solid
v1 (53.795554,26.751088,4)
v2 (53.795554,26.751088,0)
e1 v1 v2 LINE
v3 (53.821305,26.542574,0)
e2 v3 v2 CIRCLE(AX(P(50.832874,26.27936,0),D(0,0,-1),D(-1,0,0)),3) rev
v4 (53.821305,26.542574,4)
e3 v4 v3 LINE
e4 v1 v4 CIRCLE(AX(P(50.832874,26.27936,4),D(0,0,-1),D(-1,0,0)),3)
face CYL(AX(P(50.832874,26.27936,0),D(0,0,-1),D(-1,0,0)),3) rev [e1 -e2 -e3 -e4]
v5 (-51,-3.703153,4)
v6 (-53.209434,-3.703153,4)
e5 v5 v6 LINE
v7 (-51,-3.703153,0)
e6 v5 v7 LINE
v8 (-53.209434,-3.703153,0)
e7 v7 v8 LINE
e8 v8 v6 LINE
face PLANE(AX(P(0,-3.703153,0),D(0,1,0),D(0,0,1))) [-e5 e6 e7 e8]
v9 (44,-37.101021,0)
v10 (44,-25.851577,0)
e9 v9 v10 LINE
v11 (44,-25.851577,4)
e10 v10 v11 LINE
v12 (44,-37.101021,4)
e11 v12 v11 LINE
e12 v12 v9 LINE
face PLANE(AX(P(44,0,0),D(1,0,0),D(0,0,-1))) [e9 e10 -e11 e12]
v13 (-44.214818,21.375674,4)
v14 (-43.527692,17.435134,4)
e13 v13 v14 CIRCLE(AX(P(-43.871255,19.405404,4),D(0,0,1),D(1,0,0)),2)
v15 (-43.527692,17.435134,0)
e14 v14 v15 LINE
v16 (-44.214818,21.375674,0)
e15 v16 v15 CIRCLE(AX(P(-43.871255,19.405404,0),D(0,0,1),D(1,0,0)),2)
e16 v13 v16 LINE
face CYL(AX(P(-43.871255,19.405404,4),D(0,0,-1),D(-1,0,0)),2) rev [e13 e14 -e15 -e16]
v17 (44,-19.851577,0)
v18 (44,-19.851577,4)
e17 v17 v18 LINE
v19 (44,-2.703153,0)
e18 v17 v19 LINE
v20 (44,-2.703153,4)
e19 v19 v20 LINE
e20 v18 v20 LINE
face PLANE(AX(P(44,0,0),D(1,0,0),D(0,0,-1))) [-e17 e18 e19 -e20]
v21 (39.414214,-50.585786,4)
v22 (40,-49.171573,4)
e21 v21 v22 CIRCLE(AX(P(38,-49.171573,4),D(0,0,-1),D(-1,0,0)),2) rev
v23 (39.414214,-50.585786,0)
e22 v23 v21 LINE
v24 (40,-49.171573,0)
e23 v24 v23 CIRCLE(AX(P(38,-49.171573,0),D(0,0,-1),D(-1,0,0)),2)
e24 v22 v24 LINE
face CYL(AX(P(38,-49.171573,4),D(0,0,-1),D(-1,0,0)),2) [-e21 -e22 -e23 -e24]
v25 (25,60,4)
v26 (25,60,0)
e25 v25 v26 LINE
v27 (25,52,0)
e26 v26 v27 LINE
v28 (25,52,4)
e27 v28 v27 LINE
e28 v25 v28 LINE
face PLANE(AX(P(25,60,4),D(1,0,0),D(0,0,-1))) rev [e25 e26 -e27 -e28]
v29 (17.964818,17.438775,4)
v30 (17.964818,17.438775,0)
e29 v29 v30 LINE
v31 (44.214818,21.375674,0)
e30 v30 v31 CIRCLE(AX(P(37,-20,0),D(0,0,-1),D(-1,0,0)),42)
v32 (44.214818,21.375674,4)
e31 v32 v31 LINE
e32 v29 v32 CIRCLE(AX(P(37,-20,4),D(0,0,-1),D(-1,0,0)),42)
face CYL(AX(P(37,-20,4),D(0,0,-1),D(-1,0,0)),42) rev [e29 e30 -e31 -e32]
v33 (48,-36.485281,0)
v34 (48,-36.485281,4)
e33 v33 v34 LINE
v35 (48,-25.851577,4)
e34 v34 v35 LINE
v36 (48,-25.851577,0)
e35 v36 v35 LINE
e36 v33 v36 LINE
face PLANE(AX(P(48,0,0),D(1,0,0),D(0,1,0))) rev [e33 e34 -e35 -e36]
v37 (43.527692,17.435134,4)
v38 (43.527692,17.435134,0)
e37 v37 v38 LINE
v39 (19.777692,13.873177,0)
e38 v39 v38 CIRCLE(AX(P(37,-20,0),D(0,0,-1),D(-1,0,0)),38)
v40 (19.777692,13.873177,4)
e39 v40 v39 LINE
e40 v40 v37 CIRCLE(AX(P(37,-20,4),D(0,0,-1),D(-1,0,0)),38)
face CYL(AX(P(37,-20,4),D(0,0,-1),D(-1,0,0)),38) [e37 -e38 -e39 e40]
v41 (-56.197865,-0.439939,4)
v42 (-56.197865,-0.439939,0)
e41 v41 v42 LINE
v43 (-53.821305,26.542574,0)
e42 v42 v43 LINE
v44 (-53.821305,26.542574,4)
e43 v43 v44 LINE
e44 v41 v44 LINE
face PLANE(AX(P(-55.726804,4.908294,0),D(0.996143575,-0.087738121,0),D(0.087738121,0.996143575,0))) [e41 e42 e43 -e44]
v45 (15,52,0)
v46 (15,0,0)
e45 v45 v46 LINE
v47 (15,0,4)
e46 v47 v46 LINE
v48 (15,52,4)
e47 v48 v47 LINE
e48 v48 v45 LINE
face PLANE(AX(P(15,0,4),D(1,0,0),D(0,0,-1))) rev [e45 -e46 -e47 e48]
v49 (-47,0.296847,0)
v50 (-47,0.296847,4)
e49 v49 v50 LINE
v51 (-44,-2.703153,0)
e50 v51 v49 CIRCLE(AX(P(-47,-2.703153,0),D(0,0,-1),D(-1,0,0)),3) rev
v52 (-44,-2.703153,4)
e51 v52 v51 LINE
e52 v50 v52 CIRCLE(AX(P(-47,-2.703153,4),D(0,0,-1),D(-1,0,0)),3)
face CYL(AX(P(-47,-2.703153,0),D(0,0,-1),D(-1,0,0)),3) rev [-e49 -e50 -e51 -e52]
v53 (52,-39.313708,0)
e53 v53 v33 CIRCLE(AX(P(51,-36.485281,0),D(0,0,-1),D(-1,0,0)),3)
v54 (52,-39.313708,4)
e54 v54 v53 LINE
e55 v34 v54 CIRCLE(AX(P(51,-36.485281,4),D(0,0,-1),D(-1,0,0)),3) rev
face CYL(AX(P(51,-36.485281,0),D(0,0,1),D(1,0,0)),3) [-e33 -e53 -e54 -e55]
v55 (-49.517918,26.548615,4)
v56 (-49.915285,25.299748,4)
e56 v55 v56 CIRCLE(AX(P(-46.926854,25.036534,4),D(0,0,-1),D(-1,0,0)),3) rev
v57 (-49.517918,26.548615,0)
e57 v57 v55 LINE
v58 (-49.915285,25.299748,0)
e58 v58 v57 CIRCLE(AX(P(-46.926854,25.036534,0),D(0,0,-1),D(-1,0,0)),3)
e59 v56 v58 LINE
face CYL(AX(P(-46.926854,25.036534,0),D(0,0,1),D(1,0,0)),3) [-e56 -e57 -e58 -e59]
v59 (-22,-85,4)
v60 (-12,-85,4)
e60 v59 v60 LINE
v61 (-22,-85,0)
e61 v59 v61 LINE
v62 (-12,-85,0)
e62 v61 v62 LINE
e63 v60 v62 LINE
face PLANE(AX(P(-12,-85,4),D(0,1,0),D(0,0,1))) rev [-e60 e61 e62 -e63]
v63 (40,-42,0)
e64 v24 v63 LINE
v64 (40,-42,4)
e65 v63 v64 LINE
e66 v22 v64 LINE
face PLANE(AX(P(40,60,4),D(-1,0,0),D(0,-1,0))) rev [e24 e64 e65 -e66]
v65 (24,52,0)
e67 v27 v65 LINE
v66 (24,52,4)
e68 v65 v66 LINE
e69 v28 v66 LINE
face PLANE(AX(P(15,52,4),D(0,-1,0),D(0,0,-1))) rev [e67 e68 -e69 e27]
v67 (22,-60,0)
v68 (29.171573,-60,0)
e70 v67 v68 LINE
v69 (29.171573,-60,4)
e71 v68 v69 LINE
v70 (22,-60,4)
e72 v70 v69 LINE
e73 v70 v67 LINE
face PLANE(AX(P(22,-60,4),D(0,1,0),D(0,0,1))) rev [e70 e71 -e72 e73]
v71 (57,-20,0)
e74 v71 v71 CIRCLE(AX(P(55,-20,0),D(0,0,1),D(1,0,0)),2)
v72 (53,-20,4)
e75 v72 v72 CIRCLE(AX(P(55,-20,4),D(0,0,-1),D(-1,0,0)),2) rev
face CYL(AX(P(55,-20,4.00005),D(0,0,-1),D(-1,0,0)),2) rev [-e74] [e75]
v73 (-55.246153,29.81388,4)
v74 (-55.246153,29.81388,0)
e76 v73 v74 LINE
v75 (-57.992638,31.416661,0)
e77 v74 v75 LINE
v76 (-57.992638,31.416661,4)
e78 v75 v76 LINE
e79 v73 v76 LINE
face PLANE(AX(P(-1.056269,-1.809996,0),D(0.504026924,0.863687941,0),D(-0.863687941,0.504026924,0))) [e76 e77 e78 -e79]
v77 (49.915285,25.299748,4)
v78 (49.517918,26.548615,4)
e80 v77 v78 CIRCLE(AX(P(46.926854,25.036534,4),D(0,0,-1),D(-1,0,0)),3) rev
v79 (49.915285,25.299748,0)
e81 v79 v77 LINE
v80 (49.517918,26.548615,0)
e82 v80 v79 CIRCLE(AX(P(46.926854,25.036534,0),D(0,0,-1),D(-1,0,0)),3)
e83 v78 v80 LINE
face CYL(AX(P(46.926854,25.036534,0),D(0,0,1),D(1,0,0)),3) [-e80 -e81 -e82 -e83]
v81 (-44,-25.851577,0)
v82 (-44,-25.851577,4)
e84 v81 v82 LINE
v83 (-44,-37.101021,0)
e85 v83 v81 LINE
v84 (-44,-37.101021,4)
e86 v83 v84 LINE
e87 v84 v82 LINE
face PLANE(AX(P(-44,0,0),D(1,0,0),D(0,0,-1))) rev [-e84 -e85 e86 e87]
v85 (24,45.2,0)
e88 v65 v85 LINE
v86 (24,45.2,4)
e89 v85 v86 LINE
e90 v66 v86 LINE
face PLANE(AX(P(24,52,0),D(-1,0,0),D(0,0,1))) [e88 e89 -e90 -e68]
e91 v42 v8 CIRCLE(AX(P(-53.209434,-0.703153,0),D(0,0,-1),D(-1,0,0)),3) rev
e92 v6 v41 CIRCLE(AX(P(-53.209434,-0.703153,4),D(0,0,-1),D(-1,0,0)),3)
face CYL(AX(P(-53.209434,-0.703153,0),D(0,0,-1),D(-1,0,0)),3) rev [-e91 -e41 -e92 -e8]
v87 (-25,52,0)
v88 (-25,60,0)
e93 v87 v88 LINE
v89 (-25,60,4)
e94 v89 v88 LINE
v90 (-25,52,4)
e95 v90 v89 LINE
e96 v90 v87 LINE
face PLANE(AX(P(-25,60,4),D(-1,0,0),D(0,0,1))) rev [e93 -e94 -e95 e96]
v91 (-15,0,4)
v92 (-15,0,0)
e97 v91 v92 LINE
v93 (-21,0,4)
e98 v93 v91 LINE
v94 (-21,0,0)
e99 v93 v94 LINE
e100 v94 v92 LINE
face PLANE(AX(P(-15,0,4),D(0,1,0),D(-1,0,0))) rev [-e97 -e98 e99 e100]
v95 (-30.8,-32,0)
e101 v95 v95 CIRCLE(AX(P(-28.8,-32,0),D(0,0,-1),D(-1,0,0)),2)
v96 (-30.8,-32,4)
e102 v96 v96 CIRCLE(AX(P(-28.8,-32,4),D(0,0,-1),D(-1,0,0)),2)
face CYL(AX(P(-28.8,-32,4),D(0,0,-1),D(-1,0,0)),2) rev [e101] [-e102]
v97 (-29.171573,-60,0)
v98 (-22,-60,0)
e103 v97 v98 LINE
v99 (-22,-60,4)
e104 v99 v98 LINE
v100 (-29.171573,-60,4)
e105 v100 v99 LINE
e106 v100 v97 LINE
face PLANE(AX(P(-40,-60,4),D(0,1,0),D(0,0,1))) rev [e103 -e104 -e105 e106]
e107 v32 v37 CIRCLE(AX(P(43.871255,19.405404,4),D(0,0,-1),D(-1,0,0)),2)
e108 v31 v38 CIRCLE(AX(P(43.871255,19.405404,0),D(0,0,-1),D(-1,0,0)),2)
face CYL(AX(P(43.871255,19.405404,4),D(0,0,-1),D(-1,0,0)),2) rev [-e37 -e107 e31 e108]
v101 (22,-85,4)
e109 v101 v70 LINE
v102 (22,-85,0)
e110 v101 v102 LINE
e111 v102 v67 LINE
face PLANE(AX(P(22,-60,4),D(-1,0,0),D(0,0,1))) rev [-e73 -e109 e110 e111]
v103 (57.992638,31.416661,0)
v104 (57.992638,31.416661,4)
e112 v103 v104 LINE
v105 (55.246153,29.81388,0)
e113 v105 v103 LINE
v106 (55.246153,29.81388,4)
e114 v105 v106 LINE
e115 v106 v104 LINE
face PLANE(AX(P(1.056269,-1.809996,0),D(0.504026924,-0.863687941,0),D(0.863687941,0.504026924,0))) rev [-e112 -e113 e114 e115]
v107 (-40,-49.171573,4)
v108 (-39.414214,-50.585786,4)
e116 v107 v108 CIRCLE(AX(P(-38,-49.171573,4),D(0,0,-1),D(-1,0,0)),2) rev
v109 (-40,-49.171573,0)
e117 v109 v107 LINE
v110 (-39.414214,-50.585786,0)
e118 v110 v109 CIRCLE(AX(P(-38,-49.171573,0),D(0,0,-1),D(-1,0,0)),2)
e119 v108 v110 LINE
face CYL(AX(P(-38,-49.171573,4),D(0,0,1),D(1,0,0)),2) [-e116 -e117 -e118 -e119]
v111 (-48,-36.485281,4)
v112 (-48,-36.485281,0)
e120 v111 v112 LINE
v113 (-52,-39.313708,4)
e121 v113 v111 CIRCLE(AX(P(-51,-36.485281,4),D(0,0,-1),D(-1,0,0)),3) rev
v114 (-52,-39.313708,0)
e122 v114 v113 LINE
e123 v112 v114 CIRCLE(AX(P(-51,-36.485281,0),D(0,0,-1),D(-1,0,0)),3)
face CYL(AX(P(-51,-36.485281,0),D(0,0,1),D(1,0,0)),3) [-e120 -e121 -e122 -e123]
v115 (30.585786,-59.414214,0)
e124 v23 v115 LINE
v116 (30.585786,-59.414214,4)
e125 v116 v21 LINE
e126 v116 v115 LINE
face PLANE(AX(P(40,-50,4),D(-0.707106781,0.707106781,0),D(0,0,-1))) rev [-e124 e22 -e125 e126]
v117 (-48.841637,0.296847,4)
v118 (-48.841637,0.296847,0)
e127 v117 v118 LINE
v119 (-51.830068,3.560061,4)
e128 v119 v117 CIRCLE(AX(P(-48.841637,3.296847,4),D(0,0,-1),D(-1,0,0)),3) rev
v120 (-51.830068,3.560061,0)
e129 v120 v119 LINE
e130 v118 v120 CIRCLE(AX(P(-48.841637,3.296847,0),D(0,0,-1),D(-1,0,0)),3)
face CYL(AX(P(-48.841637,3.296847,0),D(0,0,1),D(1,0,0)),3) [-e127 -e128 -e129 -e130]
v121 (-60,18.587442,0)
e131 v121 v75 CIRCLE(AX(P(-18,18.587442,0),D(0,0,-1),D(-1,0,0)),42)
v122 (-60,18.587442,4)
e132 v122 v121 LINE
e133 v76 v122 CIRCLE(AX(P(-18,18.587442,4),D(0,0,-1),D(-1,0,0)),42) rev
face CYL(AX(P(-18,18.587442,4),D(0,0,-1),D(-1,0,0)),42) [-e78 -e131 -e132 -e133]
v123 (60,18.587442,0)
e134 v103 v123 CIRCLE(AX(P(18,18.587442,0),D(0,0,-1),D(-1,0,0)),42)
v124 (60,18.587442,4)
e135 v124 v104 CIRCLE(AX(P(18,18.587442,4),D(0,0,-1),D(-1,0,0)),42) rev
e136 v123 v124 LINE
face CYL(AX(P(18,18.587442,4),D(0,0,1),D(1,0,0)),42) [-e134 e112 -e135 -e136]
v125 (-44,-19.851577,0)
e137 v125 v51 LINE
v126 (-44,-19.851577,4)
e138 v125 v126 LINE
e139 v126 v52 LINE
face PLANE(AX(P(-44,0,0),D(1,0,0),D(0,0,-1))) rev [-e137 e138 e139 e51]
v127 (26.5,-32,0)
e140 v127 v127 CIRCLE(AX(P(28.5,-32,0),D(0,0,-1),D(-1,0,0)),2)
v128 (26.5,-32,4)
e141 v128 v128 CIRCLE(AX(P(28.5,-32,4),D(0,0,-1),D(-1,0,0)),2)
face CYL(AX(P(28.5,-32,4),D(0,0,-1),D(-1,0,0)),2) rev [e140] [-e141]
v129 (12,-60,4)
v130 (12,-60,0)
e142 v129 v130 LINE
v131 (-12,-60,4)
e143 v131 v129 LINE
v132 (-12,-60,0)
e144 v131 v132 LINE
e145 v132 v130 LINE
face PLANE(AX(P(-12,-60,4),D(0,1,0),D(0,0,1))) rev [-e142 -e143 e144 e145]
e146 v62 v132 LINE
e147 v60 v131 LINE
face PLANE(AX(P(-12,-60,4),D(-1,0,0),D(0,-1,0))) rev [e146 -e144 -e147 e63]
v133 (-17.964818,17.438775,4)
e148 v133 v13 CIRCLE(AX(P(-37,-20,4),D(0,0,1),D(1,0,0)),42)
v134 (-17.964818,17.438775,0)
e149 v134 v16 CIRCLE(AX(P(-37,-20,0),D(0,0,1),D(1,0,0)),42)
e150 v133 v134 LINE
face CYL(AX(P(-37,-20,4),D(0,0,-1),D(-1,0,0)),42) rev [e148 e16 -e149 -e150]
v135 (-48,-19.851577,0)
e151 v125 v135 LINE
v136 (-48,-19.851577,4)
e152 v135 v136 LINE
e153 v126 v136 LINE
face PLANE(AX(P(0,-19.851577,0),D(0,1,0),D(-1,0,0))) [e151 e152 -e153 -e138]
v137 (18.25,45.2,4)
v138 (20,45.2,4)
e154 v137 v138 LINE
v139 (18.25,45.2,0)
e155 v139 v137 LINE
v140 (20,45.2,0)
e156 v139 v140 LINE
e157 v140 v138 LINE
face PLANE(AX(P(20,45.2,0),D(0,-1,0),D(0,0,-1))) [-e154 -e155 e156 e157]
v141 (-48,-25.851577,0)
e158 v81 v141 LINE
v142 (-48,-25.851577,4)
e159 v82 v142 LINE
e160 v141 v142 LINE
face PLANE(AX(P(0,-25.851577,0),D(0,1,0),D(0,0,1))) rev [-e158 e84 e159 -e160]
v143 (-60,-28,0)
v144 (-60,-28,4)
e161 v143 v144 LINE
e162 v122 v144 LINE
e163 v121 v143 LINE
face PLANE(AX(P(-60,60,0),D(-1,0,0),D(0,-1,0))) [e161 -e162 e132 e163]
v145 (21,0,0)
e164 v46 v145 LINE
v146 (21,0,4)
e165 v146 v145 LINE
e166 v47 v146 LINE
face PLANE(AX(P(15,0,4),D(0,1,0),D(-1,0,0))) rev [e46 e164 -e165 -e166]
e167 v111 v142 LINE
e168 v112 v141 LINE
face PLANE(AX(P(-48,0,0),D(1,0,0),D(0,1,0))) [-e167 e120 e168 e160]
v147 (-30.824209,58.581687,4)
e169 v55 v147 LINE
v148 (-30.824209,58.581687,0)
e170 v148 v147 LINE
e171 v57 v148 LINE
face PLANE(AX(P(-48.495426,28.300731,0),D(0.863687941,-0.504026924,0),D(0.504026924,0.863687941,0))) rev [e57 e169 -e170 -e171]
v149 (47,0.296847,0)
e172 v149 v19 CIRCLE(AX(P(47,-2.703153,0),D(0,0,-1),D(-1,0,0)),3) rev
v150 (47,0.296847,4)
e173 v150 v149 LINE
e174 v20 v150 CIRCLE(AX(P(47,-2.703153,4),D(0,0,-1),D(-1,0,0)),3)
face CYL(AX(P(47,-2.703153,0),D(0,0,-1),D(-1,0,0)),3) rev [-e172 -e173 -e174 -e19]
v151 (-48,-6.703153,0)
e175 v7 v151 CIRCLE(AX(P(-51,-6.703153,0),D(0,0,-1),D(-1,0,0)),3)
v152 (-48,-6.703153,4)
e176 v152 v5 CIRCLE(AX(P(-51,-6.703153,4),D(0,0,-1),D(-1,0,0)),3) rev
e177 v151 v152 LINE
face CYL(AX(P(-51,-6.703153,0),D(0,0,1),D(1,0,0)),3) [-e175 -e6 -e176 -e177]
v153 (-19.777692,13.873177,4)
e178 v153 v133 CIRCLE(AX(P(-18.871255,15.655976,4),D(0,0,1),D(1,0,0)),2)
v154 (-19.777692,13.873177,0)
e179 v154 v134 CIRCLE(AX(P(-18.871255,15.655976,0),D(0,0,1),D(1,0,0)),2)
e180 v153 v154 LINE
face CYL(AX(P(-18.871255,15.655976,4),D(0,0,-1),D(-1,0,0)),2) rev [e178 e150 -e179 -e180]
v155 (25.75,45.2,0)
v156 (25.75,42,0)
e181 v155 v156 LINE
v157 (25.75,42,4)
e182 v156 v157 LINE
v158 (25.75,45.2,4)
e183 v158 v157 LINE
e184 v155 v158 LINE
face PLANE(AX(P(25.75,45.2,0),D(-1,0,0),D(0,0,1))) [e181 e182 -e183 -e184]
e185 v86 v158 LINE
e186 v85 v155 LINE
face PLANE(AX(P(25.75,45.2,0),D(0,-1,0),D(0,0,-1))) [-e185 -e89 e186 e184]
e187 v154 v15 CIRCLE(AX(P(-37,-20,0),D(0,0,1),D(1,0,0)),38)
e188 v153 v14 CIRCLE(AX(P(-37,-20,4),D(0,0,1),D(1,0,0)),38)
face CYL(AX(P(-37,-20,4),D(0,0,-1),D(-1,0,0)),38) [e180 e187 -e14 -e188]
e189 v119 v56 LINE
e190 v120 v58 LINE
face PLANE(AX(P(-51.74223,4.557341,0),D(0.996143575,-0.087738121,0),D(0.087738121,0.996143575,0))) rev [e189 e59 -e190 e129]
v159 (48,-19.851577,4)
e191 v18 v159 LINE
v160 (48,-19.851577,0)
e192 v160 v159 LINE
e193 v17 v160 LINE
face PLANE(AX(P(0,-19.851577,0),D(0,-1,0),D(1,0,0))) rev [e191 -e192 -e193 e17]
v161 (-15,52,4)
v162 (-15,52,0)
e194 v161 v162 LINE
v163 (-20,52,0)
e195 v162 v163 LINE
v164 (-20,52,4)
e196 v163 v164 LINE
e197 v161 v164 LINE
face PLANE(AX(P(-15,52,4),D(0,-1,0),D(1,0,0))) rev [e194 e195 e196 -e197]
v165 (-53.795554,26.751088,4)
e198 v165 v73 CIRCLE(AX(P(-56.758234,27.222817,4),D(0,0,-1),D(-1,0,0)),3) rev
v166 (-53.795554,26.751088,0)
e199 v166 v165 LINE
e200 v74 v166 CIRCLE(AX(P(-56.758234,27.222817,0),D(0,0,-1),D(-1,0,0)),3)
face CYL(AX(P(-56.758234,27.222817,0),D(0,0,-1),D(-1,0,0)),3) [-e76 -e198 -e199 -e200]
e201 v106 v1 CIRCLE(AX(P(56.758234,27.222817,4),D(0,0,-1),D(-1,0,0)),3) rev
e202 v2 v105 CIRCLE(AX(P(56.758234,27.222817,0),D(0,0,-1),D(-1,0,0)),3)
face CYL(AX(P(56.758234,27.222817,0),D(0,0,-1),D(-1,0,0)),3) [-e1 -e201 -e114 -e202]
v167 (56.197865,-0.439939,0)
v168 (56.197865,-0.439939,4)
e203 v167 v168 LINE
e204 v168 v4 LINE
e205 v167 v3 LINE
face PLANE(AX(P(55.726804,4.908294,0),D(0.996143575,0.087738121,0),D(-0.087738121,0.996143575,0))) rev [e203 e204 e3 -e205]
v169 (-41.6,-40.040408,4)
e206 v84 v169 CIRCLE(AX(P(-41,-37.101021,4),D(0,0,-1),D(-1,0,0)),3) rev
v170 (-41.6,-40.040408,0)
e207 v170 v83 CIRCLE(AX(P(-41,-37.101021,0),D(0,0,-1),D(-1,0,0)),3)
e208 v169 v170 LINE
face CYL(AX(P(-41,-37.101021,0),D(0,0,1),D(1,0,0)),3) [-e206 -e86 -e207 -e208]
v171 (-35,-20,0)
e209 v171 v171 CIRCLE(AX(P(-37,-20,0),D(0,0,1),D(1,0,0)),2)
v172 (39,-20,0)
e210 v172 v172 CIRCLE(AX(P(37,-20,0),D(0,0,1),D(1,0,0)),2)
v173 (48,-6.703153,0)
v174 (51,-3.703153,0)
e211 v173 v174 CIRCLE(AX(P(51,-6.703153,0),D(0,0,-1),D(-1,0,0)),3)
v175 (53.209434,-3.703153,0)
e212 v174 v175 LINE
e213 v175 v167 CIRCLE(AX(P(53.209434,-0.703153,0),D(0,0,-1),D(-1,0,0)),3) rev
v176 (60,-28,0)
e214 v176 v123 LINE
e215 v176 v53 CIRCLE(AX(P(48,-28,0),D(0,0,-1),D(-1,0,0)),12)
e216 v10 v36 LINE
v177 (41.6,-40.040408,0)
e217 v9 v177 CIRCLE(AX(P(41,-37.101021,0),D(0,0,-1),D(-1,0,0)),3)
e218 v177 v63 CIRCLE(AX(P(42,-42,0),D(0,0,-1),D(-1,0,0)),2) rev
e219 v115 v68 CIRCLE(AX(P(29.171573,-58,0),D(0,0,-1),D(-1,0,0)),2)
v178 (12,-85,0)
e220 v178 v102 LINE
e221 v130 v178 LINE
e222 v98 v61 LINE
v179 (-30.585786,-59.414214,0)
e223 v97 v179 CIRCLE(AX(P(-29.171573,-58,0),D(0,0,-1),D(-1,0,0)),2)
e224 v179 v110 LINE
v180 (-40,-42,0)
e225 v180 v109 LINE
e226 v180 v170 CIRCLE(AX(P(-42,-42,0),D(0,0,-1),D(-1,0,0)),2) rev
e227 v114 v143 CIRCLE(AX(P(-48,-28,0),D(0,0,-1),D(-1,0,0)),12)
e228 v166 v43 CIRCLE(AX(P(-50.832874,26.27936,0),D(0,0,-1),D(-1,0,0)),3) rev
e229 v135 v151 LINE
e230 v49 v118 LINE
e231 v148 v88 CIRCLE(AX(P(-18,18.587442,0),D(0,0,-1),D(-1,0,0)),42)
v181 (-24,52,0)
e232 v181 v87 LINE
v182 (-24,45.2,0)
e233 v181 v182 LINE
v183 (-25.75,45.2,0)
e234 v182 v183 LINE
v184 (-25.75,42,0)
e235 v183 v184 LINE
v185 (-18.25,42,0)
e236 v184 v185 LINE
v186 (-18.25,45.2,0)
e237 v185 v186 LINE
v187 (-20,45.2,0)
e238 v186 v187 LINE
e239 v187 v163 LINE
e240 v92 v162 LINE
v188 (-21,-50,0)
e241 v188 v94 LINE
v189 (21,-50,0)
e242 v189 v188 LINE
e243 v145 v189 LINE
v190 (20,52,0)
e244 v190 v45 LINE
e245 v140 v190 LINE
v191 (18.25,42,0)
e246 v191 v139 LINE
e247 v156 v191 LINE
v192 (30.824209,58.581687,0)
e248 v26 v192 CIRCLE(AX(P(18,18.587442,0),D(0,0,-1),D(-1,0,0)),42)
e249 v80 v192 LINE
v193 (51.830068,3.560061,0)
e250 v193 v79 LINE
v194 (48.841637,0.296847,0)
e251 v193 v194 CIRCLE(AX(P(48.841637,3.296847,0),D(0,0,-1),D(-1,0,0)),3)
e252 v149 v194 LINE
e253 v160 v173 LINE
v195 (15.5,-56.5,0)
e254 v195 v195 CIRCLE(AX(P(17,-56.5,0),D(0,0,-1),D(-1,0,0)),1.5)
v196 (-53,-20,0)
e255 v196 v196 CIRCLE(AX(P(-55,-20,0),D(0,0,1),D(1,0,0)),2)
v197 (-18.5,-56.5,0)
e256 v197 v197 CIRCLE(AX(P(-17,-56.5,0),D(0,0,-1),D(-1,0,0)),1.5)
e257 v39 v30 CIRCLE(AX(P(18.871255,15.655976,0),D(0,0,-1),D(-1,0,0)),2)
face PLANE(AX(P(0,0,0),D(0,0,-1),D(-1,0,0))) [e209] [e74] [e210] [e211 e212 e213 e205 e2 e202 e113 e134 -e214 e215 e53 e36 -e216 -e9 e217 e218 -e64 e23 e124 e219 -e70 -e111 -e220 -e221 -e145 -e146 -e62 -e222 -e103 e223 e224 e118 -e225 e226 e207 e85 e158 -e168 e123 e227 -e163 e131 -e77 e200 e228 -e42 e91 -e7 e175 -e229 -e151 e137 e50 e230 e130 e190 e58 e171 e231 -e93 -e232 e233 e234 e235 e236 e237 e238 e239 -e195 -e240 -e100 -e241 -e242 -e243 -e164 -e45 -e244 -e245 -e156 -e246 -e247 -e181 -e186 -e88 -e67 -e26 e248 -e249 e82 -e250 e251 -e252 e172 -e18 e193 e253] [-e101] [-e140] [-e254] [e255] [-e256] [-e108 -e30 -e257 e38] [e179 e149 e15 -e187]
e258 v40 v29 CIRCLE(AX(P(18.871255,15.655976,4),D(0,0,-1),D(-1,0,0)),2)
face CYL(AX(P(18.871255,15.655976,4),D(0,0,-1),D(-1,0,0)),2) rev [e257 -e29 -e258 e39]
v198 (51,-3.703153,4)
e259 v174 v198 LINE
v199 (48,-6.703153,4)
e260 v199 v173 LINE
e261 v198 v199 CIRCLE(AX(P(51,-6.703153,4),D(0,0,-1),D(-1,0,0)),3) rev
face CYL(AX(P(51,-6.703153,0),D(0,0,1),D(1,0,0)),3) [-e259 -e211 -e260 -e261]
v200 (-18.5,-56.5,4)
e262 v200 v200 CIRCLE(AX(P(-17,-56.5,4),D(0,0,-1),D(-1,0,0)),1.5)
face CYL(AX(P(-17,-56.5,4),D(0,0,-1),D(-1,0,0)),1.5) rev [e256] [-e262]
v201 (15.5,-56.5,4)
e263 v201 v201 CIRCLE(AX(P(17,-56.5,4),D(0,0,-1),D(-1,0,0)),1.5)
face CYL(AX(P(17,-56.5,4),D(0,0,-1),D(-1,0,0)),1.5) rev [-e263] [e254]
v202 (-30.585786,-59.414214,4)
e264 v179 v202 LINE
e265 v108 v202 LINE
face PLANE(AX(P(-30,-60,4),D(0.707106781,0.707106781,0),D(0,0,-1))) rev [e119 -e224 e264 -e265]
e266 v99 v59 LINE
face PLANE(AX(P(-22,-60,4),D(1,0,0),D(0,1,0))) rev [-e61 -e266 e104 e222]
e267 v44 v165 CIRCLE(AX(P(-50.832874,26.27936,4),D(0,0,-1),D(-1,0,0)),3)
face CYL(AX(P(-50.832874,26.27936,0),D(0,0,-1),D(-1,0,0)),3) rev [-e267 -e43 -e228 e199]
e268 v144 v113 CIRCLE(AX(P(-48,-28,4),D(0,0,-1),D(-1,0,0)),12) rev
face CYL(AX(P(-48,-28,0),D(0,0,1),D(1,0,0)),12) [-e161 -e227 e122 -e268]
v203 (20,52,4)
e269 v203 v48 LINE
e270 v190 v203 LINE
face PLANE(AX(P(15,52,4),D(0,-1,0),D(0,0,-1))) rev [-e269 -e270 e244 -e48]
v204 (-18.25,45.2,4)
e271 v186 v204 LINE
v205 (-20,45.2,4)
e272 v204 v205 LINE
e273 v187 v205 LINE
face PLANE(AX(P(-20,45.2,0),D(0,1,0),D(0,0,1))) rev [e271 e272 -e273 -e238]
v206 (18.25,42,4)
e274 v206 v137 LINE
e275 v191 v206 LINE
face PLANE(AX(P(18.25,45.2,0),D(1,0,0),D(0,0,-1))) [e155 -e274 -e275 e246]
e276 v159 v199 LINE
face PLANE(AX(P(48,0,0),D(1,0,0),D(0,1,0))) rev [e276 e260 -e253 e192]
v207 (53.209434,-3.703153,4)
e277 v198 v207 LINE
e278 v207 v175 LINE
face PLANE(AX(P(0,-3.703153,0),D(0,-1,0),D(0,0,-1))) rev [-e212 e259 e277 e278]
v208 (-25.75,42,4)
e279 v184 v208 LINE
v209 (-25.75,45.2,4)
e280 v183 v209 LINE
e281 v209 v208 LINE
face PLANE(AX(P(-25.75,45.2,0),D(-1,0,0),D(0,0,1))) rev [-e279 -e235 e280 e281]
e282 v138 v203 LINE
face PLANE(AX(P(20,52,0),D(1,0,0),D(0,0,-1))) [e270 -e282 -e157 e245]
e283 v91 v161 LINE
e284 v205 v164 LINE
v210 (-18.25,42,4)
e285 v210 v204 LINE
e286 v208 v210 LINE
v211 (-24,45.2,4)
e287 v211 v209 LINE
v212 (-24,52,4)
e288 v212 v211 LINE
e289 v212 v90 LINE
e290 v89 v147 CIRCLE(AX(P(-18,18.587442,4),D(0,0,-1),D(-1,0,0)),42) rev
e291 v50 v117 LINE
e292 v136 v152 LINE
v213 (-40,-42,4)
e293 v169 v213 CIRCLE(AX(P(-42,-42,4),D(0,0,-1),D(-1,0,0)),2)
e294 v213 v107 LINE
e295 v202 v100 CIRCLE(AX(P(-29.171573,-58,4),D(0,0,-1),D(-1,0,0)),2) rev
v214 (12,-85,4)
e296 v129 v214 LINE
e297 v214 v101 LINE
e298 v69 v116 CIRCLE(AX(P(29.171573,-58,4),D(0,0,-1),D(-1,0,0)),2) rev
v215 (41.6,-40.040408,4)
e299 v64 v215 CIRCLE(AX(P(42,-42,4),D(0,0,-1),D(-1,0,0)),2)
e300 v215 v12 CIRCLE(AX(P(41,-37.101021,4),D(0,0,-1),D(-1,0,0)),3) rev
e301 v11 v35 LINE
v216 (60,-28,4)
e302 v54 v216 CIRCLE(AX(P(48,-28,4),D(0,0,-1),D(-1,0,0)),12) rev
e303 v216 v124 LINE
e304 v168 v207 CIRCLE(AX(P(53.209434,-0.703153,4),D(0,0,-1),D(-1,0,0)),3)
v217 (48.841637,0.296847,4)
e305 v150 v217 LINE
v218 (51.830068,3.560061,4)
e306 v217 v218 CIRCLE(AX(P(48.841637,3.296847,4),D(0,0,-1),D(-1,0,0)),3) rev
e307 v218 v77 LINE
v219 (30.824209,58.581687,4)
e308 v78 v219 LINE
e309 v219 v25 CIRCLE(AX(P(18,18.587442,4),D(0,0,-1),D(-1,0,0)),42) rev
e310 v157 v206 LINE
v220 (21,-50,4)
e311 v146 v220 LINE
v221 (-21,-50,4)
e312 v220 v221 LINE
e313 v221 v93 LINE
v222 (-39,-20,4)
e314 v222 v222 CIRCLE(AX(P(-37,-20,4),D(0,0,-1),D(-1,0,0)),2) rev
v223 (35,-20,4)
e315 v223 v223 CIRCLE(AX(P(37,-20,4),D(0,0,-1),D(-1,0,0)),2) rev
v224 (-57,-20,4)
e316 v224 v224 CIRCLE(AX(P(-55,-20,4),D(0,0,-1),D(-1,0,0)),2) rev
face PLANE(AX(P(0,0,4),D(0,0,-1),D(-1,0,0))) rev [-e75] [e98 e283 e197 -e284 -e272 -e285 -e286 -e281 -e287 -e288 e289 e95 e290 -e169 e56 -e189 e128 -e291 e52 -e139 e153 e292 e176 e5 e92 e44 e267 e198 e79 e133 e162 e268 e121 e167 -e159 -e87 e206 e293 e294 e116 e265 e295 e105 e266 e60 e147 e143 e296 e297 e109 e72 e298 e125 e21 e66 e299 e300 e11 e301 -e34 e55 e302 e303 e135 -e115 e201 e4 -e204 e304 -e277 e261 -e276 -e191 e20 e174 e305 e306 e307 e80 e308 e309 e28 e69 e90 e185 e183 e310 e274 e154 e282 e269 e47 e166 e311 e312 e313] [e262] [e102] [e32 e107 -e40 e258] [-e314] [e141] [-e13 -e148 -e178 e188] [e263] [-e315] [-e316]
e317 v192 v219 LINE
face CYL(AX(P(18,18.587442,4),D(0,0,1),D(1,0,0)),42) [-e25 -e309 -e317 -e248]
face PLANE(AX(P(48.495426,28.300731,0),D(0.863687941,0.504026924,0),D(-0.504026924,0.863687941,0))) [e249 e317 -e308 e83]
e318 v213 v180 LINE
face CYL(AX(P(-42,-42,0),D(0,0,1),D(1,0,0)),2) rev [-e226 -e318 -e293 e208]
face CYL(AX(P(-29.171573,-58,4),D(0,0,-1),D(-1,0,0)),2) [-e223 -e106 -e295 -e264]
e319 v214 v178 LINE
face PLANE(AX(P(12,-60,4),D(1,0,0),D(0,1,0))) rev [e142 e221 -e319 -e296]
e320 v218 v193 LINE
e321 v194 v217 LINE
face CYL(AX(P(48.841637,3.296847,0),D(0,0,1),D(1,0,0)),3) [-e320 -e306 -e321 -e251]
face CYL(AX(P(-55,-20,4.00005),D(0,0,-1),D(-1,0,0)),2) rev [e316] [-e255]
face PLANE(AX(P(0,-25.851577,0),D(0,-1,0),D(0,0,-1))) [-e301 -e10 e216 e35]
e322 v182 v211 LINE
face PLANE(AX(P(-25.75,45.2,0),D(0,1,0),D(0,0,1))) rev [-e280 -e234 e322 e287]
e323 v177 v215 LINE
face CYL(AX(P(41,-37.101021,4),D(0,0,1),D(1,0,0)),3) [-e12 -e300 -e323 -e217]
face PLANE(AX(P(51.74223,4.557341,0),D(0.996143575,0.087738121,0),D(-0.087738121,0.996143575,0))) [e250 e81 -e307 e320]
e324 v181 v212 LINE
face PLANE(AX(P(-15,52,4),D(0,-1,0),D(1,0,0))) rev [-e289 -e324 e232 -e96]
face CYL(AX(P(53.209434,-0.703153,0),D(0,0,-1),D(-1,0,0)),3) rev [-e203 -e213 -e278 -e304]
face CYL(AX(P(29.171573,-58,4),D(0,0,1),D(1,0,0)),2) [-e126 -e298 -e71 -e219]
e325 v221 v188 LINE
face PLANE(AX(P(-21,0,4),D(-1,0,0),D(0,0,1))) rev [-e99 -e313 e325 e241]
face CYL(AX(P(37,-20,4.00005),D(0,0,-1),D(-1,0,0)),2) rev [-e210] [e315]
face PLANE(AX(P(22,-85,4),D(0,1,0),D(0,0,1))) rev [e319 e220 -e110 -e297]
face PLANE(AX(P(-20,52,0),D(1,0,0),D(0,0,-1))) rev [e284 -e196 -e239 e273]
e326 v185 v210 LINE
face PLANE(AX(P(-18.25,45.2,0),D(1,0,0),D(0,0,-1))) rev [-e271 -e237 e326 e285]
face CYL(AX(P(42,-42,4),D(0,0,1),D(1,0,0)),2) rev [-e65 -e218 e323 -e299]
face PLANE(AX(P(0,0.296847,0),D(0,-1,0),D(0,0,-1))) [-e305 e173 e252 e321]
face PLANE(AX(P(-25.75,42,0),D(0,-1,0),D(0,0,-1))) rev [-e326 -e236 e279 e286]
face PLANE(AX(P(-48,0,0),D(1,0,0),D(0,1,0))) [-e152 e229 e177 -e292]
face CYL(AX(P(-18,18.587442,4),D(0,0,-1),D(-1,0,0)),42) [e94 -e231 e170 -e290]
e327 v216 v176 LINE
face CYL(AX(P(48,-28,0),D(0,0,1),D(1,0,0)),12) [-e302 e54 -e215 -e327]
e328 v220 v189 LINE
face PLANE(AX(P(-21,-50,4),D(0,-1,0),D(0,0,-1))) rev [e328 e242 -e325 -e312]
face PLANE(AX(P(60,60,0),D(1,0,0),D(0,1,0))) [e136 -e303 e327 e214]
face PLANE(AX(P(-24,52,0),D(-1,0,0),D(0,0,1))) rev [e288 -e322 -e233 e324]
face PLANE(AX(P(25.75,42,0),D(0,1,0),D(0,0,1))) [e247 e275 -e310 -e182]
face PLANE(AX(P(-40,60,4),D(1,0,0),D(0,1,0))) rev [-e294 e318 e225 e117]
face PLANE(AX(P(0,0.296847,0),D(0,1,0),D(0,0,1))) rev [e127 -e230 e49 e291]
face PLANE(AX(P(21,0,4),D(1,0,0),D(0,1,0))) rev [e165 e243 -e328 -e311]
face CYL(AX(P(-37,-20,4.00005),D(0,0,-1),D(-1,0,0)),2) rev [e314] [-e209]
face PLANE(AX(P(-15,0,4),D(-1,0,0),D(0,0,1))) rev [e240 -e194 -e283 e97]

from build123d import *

# Parameters (mm, degrees)
BOSS_EXTRUDE1_DEPTH = 4
SKETCH2_R           = 2
SKETCH2_R_2         = 1.5
CUT_EXTRUDE1_DEPTH  = 95.026591983
SKETCH4_W           = 20
SKETCH4_H           = 100
BOSS_EXTRUDE2_DEPTH = 4
FILLET3_R           = 42
FILLET4_R           = 12
SKETCH7_R           = 2
CUT_EXTRUDE3_DEPTH  = 105.120122935
CHAMFER1_SIZE       = 10
FILLET8_R           = 2
CUT_EXTRUDE4_DEPTH  = 105.120122935
CUT_EXTRUDE5_DEPTH  = 105.120122935
SKETCH10_W          = 4
SKETCH10_H          = 14.148423286
CUT_EXTRUDE6_DEPTH  = 105.120122935
FILLET11_R          = 3
FILLET12_R          = 3


with BuildPart() as part:
    # Sketch1 → Boss-Extrude1 (new body)
    with BuildSketch(Plane.XY):
        Polygon((-40, 60), (-25, 60), (-25, 52), (-15, 52), (-15, 0), (-21, 0), (-21, -50), (21, -50), (21, 0), (15, 0), (15, 52), (25, 52), (25, 60), (40, 60), (40, -60), (22, -60), (22, -85), (12, -85), (12, -60), (-12, -60), (-12, -85), (-22, -85), (-22, -60), (-40, -60), align=None)
    extrude(amount=BOSS_EXTRUDE1_DEPTH)

    # Sketch2 → Cut-Extrude1 (cut, through all)
    with BuildSketch(Plane(origin=(0, 0, 0), x_dir=(-1, 0, 0), z_dir=(0, 0, -1))):
        with Locations((-28.5, -32)):
            Circle(SKETCH2_R)
        with Locations((17, -56.5)):
            Circle(SKETCH2_R_2)
        with Locations((28.8, -32)):
            Circle(SKETCH2_R)
        with Locations((-17, -56.5)):
            Circle(SKETCH2_R_2)
    extrude(amount=-CUT_EXTRUDE1_DEPTH, mode=Mode.SUBTRACT)

    # Sketch4 → Boss-Extrude2 (add)
    with BuildSketch(Plane.XY.offset(4)):
        with Locations((-50, 10)):
            Rectangle(SKETCH4_W, SKETCH4_H)
        with Locations((50, 10)):
            Rectangle(SKETCH4_W, SKETCH4_H)
    extrude(amount=-BOSS_EXTRUDE2_DEPTH)

    # Fillet3
    # the kernel refuses this fillet: 42 mm, written as the material it takes off along each edge
    with BuildSketch(Plane(origin=(60, 60, 107.531396204), x_dir=(0, -1, 0), z_dir=(0, 0, -1))) as fillet3_piece_1:
        with BuildLine():
            CenterArc((41.412558482, 42), FILLET3_R, 189.594068227, 80.405931773)
            Line((0, 35), (-0.82825117, 34.86))
            ThreePointArc((-0.82825117, 34.86), (-0.84, 17.5), (-0.84, 0))
            Line((-0.84, 0), (0, -0.84))
            Line((0, -0.84), (41.412558482, -0.84))
            Line((41.412558482, -0.84), (41.412558482, 0))
        make_face()
    extrude(amount=211.062792409, mode=Mode.SUBTRACT)
    with BuildSketch(Plane(origin=(-60, 60, 107.531396204), x_dir=(1, 0, 0), z_dir=(0, 0, -1))) as fillet3_piece_2:
        with BuildLine():
            CenterArc((42, 41.412558482), FILLET3_R, 180, 80.405931773)
            Line((0, 41.412558482), (-0.84, 41.412558482))
            Line((-0.84, 41.412558482), (-0.84, 0))
            Line((-0.84, 0), (0, -0.84))
            ThreePointArc((0, -0.84), (17.5, -0.84), (34.86, -0.82825117))
            Line((34.86, -0.82825117), (35, 0))
        make_face()
    extrude(amount=211.062792409, mode=Mode.SUBTRACT)

    # Fillet4
    fillet4_edges = [part.edges().sort_by_distance(p)[0] for p in [
        (60, -40, 2),
        (-60, -40, 2),
    ]]
    fillet(fillet4_edges, radius=FILLET4_R)

    # Sketch7 → Cut-Extrude3 (cut, through all)
    with BuildSketch(Plane.XY):
        with Locations(Location((-55, -20, 0), (0, 0, 180))):
            Circle(SKETCH7_R)
        with Locations(Location((55, -20, 0), (0, 0, 180))):
            Circle(SKETCH7_R)
        with Locations(Location((-37, -20, 0), (0, 0, 180))):
            Circle(SKETCH7_R)
        with Locations(Location((37, -20, 0), (0, 0, 180))):
            Circle(SKETCH7_R)
    extrude(amount=CUT_EXTRUDE3_DEPTH, mode=Mode.SUBTRACT)

    # Chamfer1
    chamfer1_edges = [part.edges().sort_by_distance(p)[0] for p in [
        (-40, -60, 2),
        (40, -60, 2),
    ]]
    chamfer(chamfer1_edges, length=CHAMFER1_SIZE)

    # Fillet8
    fillet8_edges = [part.edges().sort_by_distance(p)[0] for p in [
        (-30, -60, 2),
        (-40, -50, 2),
        (30, -60, 2),
        (40, -50, 2),
        (40, -40, 2),
        (-40, -40, 2),
    ]]
    fillet(fillet8_edges, radius=FILLET8_R)

    # Sketch8 → Cut-Extrude4 (cut, through all)
    with BuildSketch(Plane(origin=(0, 0, 0), x_dir=(-1, 0, 0), z_dir=(0, 0, -1))):
        with BuildLine():
            ThreePointArc((-17.964817996, 17.438774634), (-30.770630407, 21.535466224), (-44.214817996, 21.375674028))
            ThreePointArc((-44.214817996, 21.375674028), (-45.841525426, 19.061841075), (-43.527692473, 17.435133644))
            ThreePointArc((-43.527692473, 17.435133644), (-31.363903701, 17.579707536), (-19.777692473, 13.87317705))
            ThreePointArc((-19.777692473, 13.87317705), (-17.088456442, 14.749538603), (-17.964817996, 17.438774634))
        make_face()
        with BuildLine():
            ThreePointArc((17.964817996, 17.438774634), (30.770630407, 21.535466224), (44.214817996, 21.375674028))
            ThreePointArc((44.214817996, 21.375674028), (45.841525426, 19.061841075), (43.527692473, 17.435133644))
            ThreePointArc((43.527692473, 17.435133644), (31.363903701, 17.579707536), (19.777692473, 13.87317705))
            ThreePointArc((19.777692473, 13.87317705), (17.088456442, 14.749538603), (17.964817996, 17.438774634))
        make_face()
    extrude(amount=-CUT_EXTRUDE4_DEPTH, mode=Mode.SUBTRACT)

    # Sketch9 → Cut-Extrude5 (cut, through all)
    with BuildSketch(Plane.XY.offset(4)):
        Polygon((-24, 52), (-20, 52), (-20, 45.2), (-18.25, 45.2), (-18.25, 42), (-25.75, 42), (-25.75, 45.2), (-24, 45.2), align=None)
    cut_extrude5 = extrude(amount=-CUT_EXTRUDE5_DEPTH, mode=Mode.SUBTRACT)

    # Mirror1: Cut-Extrude5 across plane
    add(cut_extrude5.mirror(Plane(origin=(0, 0, 0), x_dir=(0, 0, 1), z_dir=(1, 0, 0))), mode=Mode.SUBTRACT)

    # Sketch10 → Cut-Extrude6 (cut, through all)
    with BuildSketch(Plane.XY.offset(4)):
        with Locations((46, -32.925788357)):
            Rectangle(SKETCH10_W, SKETCH10_H)
        with BuildLine():
            Line((44, -19.851576714), (48, -19.851576714))
            Line((48, -19.851576714), (48, -3.703153428))
            Line((48, -3.703153428), (56.485281374, -3.703153428))
            Line((56.485281374, -3.703153428), (53.762388988, 27.211478811))
            Line((53.762388988, 27.211478811), (53.006446404, 28.506843132))
            Line((53.006446404, 28.506843132), (57.992638284, 31.416661411))
            ThreePointArc((57.992638284, 31.416661411), (47.696624216, 48.287786805), (30.824208916, 58.581686925))
            Line((30.824208916, 58.581686925), (49.856368895, 25.968653244))
            Line((49.856368895, 25.968653244), (52.117484809, 0.296846572))
            Line((52.117484809, 0.296846572), (44, 0.296846572))
            Line((44, 0.296846572), (44, -19.851576714))
        make_face()
    cut_extrude6 = extrude(amount=-CUT_EXTRUDE6_DEPTH, mode=Mode.SUBTRACT)

    # Mirror5: Cut-Extrude6 across plane
    add(cut_extrude6.mirror(Plane(origin=(0, 0, 0), x_dir=(0, 0, 1), z_dir=(1, 0, 0))), mode=Mode.SUBTRACT)

    # Fillet11
    fillet11_edges = [part.edges().sort_by_distance(p)[0] for p in [
        (-53.762388988, 27.211478811, 2),
        (-49.856368895, 25.968653244, 2),
        (-52.117484809, 0.296846572, 2),
        (-56.485281374, -3.703153428, 2),
        (-48, -3.703153428, 2),
        (-44, 0.296846572, 2),
        (-48, -40, 2),
        (-44, -40, 2),
        (53.762388988, 27.211478811, 2),
        (49.856368895, 25.968653244, 2),
        (52.117484809, 0.296846572, 2),
        (56.485281374, -3.703153428, 2),
        (48, -3.703153428, 2),
        (44, 0.296846572, 2),
        (44, -40, 2),
        (48, -40, 2),
    ]]
    fillet(fillet11_edges, radius=FILLET11_R)

    # Fillet12
    fillet12_edges = [part.edges().sort_by_distance(p)[0] for p in [
        (-53.006446404, 28.506843132, 2),
        (53.006446404, 28.506843132, 2),
    ]]
    fillet(fillet12_edges, radius=FILLET12_R)


solid = part.part
